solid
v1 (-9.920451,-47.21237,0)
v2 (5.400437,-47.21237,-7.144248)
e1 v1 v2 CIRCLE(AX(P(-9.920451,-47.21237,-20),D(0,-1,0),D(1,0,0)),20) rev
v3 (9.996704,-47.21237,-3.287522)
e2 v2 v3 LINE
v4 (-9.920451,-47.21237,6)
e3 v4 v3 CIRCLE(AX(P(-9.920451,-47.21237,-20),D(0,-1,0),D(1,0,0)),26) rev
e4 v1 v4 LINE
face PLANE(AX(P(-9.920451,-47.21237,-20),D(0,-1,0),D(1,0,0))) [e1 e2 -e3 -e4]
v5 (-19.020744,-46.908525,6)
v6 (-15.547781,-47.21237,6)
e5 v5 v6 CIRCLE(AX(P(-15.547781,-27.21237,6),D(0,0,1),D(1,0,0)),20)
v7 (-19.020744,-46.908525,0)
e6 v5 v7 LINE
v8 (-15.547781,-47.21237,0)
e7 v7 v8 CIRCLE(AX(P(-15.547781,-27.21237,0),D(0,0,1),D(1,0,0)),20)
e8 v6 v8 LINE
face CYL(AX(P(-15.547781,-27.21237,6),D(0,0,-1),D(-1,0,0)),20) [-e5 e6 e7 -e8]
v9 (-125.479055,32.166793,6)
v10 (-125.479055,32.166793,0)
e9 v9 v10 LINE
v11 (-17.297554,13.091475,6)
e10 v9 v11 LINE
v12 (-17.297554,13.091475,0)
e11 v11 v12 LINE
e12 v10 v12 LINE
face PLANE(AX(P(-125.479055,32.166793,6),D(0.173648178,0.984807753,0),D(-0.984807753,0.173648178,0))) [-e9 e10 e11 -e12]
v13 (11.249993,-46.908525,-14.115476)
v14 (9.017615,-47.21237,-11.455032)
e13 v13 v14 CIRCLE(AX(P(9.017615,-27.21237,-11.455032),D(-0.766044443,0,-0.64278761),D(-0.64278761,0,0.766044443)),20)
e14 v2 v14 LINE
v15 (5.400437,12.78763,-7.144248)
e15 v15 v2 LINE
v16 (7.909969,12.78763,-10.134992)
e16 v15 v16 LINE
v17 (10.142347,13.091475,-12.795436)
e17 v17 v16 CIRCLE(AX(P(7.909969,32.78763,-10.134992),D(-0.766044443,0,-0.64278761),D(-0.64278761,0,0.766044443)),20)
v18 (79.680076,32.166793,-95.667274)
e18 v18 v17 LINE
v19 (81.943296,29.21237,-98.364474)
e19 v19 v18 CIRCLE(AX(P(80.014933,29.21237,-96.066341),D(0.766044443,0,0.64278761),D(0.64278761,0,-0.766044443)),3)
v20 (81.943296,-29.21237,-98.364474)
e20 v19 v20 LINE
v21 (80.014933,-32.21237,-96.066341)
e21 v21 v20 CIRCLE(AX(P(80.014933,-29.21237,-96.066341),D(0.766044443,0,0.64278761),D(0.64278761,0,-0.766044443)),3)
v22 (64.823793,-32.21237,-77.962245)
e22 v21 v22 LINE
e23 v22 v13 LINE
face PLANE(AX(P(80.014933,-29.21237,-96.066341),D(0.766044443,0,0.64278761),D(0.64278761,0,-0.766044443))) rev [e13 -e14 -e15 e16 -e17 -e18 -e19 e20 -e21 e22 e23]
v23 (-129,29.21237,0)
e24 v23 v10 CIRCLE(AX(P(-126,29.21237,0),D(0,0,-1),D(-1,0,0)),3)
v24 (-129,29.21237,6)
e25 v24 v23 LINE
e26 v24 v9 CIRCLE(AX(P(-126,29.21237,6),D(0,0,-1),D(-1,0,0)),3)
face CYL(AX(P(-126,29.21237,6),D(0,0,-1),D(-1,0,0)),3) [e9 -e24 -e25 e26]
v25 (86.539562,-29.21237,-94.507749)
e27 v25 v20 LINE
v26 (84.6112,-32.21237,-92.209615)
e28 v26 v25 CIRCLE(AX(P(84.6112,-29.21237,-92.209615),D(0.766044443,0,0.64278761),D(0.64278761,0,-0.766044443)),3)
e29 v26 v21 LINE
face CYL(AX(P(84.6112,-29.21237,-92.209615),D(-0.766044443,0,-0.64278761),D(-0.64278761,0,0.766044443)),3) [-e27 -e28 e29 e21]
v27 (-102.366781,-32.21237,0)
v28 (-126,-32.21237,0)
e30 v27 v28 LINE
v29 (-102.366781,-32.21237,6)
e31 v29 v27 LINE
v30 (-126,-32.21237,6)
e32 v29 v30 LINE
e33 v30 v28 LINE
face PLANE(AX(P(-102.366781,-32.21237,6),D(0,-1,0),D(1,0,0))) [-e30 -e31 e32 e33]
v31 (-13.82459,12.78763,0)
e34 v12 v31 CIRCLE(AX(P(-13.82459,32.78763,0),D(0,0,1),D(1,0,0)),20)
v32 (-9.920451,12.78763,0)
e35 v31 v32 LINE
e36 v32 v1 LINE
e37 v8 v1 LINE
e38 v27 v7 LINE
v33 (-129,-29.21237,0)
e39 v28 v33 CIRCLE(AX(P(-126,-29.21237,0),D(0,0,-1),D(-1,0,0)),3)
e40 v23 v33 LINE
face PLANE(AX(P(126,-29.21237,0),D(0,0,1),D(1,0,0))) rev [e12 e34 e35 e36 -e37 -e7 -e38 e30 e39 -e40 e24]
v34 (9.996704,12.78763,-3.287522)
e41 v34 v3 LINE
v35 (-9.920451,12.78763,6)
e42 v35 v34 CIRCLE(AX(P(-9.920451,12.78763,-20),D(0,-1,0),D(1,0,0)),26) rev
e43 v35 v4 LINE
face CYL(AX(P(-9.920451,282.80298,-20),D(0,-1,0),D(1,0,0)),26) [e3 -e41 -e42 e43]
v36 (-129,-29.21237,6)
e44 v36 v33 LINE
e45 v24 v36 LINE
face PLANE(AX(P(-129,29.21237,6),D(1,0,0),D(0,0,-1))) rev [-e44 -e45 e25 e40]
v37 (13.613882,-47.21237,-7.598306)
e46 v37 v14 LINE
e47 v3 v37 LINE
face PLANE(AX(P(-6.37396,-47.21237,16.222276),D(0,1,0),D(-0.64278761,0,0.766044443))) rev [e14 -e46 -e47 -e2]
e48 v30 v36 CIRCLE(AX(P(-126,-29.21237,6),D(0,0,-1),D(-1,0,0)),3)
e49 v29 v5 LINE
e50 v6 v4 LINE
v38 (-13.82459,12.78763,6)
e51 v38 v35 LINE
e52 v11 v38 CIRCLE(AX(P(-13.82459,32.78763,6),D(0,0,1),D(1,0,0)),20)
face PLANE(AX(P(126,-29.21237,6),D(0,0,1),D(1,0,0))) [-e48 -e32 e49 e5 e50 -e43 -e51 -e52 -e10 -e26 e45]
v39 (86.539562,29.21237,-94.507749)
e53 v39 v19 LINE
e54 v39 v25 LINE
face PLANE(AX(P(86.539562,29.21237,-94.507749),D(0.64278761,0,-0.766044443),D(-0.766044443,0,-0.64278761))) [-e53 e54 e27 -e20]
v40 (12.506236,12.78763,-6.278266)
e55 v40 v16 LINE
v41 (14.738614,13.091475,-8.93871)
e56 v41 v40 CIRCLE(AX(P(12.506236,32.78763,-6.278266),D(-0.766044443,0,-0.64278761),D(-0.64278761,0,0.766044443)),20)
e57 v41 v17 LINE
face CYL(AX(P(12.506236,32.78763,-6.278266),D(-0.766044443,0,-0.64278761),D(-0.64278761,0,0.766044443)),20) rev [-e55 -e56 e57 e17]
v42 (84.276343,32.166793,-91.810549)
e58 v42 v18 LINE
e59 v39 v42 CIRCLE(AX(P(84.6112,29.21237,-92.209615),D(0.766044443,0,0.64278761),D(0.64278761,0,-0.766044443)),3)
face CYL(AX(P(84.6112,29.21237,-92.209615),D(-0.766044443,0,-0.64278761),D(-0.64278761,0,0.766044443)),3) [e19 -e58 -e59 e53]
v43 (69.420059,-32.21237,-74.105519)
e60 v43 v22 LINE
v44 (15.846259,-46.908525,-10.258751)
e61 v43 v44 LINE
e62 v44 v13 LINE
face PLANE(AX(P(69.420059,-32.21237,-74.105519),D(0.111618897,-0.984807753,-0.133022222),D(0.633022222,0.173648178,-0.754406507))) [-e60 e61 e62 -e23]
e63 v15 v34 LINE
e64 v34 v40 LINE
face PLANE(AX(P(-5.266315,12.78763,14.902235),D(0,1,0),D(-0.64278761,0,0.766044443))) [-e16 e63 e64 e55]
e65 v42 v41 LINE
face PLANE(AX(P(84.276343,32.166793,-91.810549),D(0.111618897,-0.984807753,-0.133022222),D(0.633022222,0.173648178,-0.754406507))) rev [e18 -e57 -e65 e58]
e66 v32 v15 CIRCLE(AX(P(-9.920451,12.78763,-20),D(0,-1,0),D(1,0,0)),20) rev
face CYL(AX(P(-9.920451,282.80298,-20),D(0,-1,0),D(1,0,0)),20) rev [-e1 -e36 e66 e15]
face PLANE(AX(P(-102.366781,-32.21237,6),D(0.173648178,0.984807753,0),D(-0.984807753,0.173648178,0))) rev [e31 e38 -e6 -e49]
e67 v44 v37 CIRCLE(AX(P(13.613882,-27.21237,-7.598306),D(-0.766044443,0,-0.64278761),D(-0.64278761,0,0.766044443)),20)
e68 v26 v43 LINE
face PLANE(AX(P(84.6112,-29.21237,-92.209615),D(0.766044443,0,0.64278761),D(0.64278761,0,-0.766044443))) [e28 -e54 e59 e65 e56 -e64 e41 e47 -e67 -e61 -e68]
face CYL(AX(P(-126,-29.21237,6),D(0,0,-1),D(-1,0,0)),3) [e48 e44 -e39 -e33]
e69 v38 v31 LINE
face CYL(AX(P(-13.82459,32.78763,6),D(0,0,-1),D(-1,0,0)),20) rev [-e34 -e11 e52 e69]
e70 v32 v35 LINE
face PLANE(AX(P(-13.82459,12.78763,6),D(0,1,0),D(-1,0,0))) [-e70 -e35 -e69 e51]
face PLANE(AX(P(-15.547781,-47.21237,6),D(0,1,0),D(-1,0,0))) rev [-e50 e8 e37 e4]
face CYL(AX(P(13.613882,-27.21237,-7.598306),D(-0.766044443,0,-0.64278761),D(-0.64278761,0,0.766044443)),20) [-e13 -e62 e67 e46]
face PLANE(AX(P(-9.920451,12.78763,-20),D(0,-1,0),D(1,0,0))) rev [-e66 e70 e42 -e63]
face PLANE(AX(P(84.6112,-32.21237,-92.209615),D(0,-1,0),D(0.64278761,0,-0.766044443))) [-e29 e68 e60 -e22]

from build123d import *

# Parameters (mm, degrees)
BASE_EXTRUDE_DEPTH     = 6
PROCESS_BENDS1_START   = -47.212369611
PROCESS_BENDS1_DEPTH   = 79.424739222
PROCESS_BENDS1_START_2 = -29.212369611
PROCESS_BENDS1_2_DEPTH = 42
PROCESS_BENDS1_3_DEPTH = 79.379162481
PROCESS_BENDS1_START_3 = -7.599506721
PROCESS_BENDS1_4_DEPTH = 13.144247807
PROCESS_BENDS1_START_4 = -0.455258914
PROCESS_BENDS1_5_DEPTH = 6


with BuildPart() as part:
    # Sketch1 → Base-Extrude (new body)
    with BuildSketch(Plane.XY):
        with BuildLine():
            Line((-125.479055467, 32.16679287), (-17.29755389, 13.091475329))
            ThreePointArc((-17.29755389, 13.091475329), (-15.567705192, 12.863736427), (-13.824590337, 12.787630389))
            Line((-13.824590337, 12.787630389), (13.824590337, 12.787630389))
            ThreePointArc((13.824590337, 12.787630389), (15.567705192, 12.863736427), (17.29755389, 13.091475329))
            Line((17.29755389, 13.091475329), (125.479055467, 32.16679287))
            ThreePointArc((125.479055467, 32.16679287), (127.928362829, 31.51050294), (129, 29.212369611))
            Line((129, 29.212369611), (129, -29.212369611))
            ThreePointArc((129, -29.212369611), (128.121320344, -31.333689955), (126, -32.212369611))
            Line((126, -32.212369611), (102.366781185, -32.212369611))
            Line((102.366781185, -32.212369611), (19.020744173, -46.908524671))
            ThreePointArc((19.020744173, -46.908524671), (17.290895475, -47.136263573), (15.54778062, -47.212369611))
            Line((15.54778062, -47.212369611), (-15.54778062, -47.212369611))
            ThreePointArc((-15.54778062, -47.212369611), (-17.290895475, -47.136263573), (-19.020744173, -46.908524671))
            Line((-19.020744173, -46.908524671), (-102.366781185, -32.212369611))
            Line((-102.366781185, -32.212369611), (-126, -32.212369611))
            ThreePointArc((-126, -32.212369611), (-128.121320344, -31.333689955), (-129, -29.212369611))
            Line((-129, -29.212369611), (-129, 29.212369611))
            ThreePointArc((-129, 29.212369611), (-127.928362829, 31.51050294), (-125.479055467, 32.16679287))
        make_face()
    extrude(amount=BASE_EXTRUDE_DEPTH)

    # Process-Bends1: read off the stored shape, not the designer's step
    # Process-Bends1 outline → Process-Bends1 (cut)
    with BuildSketch(Plane(origin=(0, 0, 0), x_dir=(1, 0, 0), z_dir=(0, 1, 0)).offset(PROCESS_BENDS1_START)):
        with BuildLine():
            Line((129, 0), (6.692796258, 0))
            ThreePointArc((6.692796258, 0), (-1.088690602, -4.454038521), (-9.920451468, -6))
            Line((-9.920451468, -6), (129, -6))
            Line((129, -6), (129, 0))
        make_face()
    extrude(amount=PROCESS_BENDS1_DEPTH, mode=Mode.SUBTRACT)

    # Process-Bends1 2 outline → Process-Bends1 2 (add)
    with BuildSketch(Plane(origin=(0, 0, 0), x_dir=(1, 0, 0), z_dir=(0, 1, 0)).offset(PROCESS_BENDS1_START_2)):
        with BuildLine():
            ThreePointArc((6.692796258, 0), (8.418565431, 1.569577889), (9.996704053, 3.287522148))
            Line((9.996704053, 3.287522148), (86.539562416, 94.50774859))
            Line((86.539562416, 94.50774859), (81.943295757, 98.364474248))
            Line((81.943295757, 98.364474248), (5.400437394, 7.144247806))
            ThreePointArc((5.400437394, 7.144247806), (-1.468086233, 1.873844259), (-9.920451468, 0))
            Line((-9.920451468, 0), (6.692796258, 0))
        make_face()
    extrude(amount=PROCESS_BENDS1_2_DEPTH)

    # Process-Bends1 3 outline → Process-Bends1 3 (add)
    with BuildSketch(Plane(origin=(0, 0, 0), x_dir=(1, 0, 0), z_dir=(0, 1, 0)).offset(PROCESS_BENDS1_START)):
        with BuildLine():
            ThreePointArc((6.692796258, 0), (8.418565431, 1.569577889), (9.996704053, 3.287522148))
            Line((9.996704053, 3.287522148), (86.539562416, 94.50774859))
            Line((86.539562416, 94.50774859), (81.943295757, 98.364474248))
            Line((81.943295757, 98.364474248), (5.400437394, 7.144247806))
            ThreePointArc((5.400437394, 7.144247806), (-1.468086233, 1.873844259), (-9.920451468, 0))
            Line((-9.920451468, 0), (6.692796258, 0))
        make_face()
    extrude(amount=PROCESS_BENDS1_3_DEPTH)

    # Process-Bends1 4 outline → Process-Bends1 4 (cut)
    with BuildSketch(Plane(origin=(0, 0, 0), x_dir=(0.6427876096865379, 0, -0.7660444431189791), z_dir=(0.7660444431189791, 0, 0.6427876096865381)).offset(PROCESS_BENDS1_START_3)):
        with BuildLine():
            Line((-8, 12.787630389), (12.848284445, 12.787630389))
            ThreePointArc((12.848284445, 12.787630389), (14.5913993, 12.863736427), (16.321247998, 13.091475329))
            Line((16.321247998, 13.091475329), (124.502749575, 32.16679287))
            Line((124.502749575, 32.16679287), (-8, 32.16679287))
            Line((-8, 32.16679287), (-8, 12.787630389))
        make_face()
        with BuildLine():
            Line((128.023694108, 32.16679287), (125.54463864, 32.16679287))
            ThreePointArc((125.54463864, 32.16679287), (127.321827437, 31.14073244), (128.023694108, 29.212369611))
            Line((128.023694108, 29.212369611), (128.023694108, 32.16679287))
        make_face()
        with BuildLine():
            ThreePointArc((18.044438281, -46.908524671), (16.314589583, -47.136263573), (14.571474728, -47.212369611))
            Line((14.571474728, -47.212369611), (128.023694108, -47.212369611))
            Line((128.023694108, -47.212369611), (128.023694108, -29.212369611))
            ThreePointArc((128.023694108, -29.212369611), (127.145014451, -31.333689954), (125.023694108, -32.212369611))
            Line((125.023694108, -32.212369611), (101.390475292, -32.212369611))
            Line((101.390475292, -32.212369611), (18.044438281, -46.908524671))
        make_face()
    extrude(amount=PROCESS_BENDS1_4_DEPTH, mode=Mode.SUBTRACT)

    # Process-Bends1 5 outline → Process-Bends1 5 (add)
    with BuildSketch(Plane(origin=(0, 0, 0), x_dir=(0.6427876096865379, 0, -0.7660444431189791), z_dir=(0.7660444431189791, 0, 0.6427876096865381)).offset(PROCESS_BENDS1_START_4)):
        with BuildLine():
            ThreePointArc((125.54463864, 32.16679287), (125.023694107, 32.212369611), (124.502749575, 32.16679287))
            Line((124.502749575, 32.16679287), (125.54463864, 32.16679287))
        make_face()
    extrude(amount=PROCESS_BENDS1_5_DEPTH)


solid = part.part
